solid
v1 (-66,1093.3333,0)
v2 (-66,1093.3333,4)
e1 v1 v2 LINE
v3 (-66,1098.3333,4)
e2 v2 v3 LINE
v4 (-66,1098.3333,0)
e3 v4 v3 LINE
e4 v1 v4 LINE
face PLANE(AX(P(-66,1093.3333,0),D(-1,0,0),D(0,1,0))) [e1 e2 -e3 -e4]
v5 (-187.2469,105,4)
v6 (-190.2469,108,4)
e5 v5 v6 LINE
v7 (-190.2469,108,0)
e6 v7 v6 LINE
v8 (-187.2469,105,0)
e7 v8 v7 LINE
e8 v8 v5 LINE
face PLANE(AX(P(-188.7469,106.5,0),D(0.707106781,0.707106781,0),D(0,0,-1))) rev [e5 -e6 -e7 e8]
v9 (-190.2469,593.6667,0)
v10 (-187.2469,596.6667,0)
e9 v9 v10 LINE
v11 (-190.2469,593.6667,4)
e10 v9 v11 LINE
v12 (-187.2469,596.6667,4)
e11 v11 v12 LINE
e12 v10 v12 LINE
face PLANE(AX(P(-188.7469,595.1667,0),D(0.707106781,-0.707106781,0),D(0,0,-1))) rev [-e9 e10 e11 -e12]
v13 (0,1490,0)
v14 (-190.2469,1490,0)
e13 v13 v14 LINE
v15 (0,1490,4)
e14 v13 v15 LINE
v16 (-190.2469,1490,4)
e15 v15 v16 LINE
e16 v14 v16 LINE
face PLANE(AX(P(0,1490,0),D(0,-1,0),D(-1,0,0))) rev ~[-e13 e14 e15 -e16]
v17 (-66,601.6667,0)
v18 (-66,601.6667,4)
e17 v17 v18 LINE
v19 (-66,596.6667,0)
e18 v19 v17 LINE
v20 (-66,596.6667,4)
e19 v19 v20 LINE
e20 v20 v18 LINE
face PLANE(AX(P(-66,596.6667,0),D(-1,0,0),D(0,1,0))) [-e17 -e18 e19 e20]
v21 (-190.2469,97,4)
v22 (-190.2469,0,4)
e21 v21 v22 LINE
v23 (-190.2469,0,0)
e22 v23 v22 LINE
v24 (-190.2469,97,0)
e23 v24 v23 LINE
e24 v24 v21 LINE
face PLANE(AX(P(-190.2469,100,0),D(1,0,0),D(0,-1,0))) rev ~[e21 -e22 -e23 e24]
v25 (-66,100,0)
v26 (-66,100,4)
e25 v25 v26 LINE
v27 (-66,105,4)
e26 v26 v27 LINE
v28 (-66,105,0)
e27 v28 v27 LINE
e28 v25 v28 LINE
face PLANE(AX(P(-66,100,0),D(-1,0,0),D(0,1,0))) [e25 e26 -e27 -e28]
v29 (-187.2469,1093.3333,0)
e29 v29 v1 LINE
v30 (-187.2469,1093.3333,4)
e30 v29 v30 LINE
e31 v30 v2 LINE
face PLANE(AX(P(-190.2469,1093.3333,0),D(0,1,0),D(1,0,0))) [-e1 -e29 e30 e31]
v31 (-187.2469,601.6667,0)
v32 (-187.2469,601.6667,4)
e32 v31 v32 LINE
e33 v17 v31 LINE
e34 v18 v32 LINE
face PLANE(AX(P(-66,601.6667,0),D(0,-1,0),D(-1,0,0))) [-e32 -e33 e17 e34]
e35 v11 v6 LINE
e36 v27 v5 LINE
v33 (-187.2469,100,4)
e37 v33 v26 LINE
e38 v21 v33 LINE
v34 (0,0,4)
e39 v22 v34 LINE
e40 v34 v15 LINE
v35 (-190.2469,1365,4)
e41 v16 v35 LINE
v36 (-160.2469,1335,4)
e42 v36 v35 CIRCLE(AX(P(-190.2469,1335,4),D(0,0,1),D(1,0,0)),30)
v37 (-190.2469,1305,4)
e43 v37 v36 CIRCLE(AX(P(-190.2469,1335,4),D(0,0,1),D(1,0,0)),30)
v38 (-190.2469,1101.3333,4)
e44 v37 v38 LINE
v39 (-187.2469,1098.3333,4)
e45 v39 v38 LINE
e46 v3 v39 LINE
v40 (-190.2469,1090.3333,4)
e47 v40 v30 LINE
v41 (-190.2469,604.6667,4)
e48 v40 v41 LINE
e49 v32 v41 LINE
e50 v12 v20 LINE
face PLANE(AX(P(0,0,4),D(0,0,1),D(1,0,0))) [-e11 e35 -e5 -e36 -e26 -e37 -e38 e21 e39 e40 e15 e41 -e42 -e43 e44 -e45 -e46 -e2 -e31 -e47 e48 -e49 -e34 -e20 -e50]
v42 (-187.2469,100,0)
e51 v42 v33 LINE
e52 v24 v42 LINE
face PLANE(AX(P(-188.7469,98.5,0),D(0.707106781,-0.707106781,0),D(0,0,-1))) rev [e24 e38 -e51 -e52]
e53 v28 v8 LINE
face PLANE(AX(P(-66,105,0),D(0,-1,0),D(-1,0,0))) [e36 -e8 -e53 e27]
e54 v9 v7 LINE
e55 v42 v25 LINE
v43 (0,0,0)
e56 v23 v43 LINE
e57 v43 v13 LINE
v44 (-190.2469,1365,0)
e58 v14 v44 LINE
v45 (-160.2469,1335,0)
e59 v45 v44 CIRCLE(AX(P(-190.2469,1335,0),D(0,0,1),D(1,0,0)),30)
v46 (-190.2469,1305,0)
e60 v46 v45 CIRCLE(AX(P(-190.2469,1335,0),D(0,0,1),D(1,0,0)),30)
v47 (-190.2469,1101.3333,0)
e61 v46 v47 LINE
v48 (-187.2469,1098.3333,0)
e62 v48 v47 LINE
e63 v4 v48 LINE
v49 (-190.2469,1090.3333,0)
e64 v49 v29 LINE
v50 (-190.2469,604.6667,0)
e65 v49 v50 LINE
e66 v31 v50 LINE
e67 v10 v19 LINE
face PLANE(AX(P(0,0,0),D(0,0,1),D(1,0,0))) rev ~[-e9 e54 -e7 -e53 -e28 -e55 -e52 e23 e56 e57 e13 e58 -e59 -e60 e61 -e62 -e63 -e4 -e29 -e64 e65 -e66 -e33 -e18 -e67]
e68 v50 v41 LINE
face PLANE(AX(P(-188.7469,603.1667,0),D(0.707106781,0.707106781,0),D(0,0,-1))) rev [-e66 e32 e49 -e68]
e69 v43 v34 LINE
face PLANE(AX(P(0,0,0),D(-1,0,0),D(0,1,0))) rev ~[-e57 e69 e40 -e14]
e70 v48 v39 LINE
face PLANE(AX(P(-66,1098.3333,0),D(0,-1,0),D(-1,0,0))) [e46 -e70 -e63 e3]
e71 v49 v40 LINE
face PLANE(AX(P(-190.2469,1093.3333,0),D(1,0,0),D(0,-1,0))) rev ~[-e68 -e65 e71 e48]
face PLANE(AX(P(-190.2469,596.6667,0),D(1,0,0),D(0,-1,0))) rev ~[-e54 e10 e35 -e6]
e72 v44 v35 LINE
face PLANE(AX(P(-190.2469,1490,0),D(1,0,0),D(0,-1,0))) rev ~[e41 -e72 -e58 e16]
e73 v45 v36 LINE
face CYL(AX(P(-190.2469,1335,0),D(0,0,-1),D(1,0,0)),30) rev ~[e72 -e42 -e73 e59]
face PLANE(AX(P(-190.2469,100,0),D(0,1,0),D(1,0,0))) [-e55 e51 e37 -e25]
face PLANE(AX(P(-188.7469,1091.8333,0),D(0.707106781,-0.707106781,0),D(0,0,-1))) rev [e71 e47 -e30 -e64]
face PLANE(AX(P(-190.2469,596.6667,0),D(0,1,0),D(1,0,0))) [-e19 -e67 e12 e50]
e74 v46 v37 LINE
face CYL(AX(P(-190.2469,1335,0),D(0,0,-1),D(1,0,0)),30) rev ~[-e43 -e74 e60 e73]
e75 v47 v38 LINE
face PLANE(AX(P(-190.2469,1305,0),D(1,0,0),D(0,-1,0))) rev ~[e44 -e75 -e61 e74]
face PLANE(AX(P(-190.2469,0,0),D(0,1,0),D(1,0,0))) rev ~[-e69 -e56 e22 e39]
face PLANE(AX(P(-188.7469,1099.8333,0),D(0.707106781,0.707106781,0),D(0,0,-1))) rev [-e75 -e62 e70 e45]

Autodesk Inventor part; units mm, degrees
ref_plane "YZ Plane" through (0, 0, 0) normal (1, 0, 0) x (0, 1, 0)
ref_plane "XZ Plane" through (0, 0, 0) normal (0, 1, 0) x (-1, 0, 0)
ref_plane "XY Plane" through (0, 0, 0) normal (0, 0, 1) x (1, 0, 0)
sketch "Sketch1" plane through (0, 0, 0) normal (0, 0, 1) x (1, 0, 0)
  line L0 (0, 1490) -> (-190.2469, 1490)
  line L1 (-190.2469, 1490) -> (-190.2469, 0)
  line L2 (-190.2469, 0) -> (0, 0)
  line L3 (0, 0) -> (0, 1490)
  line L4 (-190.2469, 100) -> (-66, 100)
  line L5 (-66, 100) -> (-66, 105)
  line L6 (-66, 105) -> (-190.2469, 105)
  line L7 (-190.2469, 105) -> (-190.2469, 100)
  line L8 (-190.2469, 596.6667) -> (-66, 596.6667)
  line L9 (-66, 596.6667) -> (-66, 601.6667)
  line L10 (-66, 601.6667) -> (-190.2469, 601.6667)
  line L11 (-190.2469, 601.6667) -> (-190.2469, 596.6667)
  line L12 (-190.2469, 1093.3333) -> (-66, 1093.3333)
  line L13 (-66, 1093.3333) -> (-66, 1098.3333)
  line L14 (-66, 1098.3333) -> (-190.2469, 1098.3333)
  line L15 (-190.2469, 1098.3333) -> (-190.2469, 1093.3333)
  circle A0 centre (-190.2469, 1335) radius 30
  point P0 (-190.2469, 1098.3333)
  point P1 (-190.2469, 1093.3333)
  point P2 (-190.2469, 601.6667)
  point P3 (-190.2469, 596.6667)
  point P4 (-190.2469, 1365)
  point P5 (-190.2469, 1305)
  dimension "d0" = 1490
  dimension "d1" = 190.2469
  dimension "d2" = 5
  dimension "d4" = 100
  dimension "d7" = 496.6667
  dimension "d23" = 66
  dimension "d29" = 60
  dimension "d30" = 1335
extrude "Plate1" add sketch "Sketch1" along normal blind 4 contours L3 L2 L1 L4 L5 L6 L8 L9 L10 L12 L13 L14 A0 L0
chamfer "Corner Chamfer1" distance 3 angle 45 6 edges at (-190.2469, 100, 2) (-190.2469, 105, 2) (-190.2469, 596.6667, 2) (-190.2469, 601.6667, 2) (-190.2469, 1098.3333, 2) (-190.2469, 1093.3333, 2)
equation "\"d0\" = Стрингер_длина"
equation "\"d1\" = стрингер_глубина_1"
equation "\"d2\" = паз_под_стрингер_толщина"
equation "\"d7\" = Шаг_шпангоутов"
equation "\"d23\" = паз_под_стрингер_глубина - Thickness"
equation "\"d29\" = 2 * радиус_выреза_под_сварку"
equation "\"d12\" = Thickness"
equation "\"BendRadius\" = Thickness"
equation "\"BendReliefWidth\" = Thickness"
equation "\"BendReliefDepth\" = 0.5 * Thickness"
equation "\"CornerReliefSize\" = 4 * Thickness"
equation "\"MinimumRemnant\" = 2 * Thickness"
equation "\"TransitionRadius\" = BendRadius"
equation "\"JacobiRadiusSize\" = BendRadius"
equation "\"GapSize\" = Thickness"
equation "\"Стрингер_длина\" = 1490"
equation "\"стрингер_глубина_1\" = 190.246925"
equation "\"паз_под_стрингер_толщина\" = 5"
equation "\"Шаг_шпангоутов\" = 496.666667"
equation "\"паз_под_стрингер_глубина\" = 70"
equation "\"Thickness\" = 4"
equation "\"радиус_выреза_под_сварку\" = 30"
properties part number "GBK 3102 stringer 1" material "Steel"
